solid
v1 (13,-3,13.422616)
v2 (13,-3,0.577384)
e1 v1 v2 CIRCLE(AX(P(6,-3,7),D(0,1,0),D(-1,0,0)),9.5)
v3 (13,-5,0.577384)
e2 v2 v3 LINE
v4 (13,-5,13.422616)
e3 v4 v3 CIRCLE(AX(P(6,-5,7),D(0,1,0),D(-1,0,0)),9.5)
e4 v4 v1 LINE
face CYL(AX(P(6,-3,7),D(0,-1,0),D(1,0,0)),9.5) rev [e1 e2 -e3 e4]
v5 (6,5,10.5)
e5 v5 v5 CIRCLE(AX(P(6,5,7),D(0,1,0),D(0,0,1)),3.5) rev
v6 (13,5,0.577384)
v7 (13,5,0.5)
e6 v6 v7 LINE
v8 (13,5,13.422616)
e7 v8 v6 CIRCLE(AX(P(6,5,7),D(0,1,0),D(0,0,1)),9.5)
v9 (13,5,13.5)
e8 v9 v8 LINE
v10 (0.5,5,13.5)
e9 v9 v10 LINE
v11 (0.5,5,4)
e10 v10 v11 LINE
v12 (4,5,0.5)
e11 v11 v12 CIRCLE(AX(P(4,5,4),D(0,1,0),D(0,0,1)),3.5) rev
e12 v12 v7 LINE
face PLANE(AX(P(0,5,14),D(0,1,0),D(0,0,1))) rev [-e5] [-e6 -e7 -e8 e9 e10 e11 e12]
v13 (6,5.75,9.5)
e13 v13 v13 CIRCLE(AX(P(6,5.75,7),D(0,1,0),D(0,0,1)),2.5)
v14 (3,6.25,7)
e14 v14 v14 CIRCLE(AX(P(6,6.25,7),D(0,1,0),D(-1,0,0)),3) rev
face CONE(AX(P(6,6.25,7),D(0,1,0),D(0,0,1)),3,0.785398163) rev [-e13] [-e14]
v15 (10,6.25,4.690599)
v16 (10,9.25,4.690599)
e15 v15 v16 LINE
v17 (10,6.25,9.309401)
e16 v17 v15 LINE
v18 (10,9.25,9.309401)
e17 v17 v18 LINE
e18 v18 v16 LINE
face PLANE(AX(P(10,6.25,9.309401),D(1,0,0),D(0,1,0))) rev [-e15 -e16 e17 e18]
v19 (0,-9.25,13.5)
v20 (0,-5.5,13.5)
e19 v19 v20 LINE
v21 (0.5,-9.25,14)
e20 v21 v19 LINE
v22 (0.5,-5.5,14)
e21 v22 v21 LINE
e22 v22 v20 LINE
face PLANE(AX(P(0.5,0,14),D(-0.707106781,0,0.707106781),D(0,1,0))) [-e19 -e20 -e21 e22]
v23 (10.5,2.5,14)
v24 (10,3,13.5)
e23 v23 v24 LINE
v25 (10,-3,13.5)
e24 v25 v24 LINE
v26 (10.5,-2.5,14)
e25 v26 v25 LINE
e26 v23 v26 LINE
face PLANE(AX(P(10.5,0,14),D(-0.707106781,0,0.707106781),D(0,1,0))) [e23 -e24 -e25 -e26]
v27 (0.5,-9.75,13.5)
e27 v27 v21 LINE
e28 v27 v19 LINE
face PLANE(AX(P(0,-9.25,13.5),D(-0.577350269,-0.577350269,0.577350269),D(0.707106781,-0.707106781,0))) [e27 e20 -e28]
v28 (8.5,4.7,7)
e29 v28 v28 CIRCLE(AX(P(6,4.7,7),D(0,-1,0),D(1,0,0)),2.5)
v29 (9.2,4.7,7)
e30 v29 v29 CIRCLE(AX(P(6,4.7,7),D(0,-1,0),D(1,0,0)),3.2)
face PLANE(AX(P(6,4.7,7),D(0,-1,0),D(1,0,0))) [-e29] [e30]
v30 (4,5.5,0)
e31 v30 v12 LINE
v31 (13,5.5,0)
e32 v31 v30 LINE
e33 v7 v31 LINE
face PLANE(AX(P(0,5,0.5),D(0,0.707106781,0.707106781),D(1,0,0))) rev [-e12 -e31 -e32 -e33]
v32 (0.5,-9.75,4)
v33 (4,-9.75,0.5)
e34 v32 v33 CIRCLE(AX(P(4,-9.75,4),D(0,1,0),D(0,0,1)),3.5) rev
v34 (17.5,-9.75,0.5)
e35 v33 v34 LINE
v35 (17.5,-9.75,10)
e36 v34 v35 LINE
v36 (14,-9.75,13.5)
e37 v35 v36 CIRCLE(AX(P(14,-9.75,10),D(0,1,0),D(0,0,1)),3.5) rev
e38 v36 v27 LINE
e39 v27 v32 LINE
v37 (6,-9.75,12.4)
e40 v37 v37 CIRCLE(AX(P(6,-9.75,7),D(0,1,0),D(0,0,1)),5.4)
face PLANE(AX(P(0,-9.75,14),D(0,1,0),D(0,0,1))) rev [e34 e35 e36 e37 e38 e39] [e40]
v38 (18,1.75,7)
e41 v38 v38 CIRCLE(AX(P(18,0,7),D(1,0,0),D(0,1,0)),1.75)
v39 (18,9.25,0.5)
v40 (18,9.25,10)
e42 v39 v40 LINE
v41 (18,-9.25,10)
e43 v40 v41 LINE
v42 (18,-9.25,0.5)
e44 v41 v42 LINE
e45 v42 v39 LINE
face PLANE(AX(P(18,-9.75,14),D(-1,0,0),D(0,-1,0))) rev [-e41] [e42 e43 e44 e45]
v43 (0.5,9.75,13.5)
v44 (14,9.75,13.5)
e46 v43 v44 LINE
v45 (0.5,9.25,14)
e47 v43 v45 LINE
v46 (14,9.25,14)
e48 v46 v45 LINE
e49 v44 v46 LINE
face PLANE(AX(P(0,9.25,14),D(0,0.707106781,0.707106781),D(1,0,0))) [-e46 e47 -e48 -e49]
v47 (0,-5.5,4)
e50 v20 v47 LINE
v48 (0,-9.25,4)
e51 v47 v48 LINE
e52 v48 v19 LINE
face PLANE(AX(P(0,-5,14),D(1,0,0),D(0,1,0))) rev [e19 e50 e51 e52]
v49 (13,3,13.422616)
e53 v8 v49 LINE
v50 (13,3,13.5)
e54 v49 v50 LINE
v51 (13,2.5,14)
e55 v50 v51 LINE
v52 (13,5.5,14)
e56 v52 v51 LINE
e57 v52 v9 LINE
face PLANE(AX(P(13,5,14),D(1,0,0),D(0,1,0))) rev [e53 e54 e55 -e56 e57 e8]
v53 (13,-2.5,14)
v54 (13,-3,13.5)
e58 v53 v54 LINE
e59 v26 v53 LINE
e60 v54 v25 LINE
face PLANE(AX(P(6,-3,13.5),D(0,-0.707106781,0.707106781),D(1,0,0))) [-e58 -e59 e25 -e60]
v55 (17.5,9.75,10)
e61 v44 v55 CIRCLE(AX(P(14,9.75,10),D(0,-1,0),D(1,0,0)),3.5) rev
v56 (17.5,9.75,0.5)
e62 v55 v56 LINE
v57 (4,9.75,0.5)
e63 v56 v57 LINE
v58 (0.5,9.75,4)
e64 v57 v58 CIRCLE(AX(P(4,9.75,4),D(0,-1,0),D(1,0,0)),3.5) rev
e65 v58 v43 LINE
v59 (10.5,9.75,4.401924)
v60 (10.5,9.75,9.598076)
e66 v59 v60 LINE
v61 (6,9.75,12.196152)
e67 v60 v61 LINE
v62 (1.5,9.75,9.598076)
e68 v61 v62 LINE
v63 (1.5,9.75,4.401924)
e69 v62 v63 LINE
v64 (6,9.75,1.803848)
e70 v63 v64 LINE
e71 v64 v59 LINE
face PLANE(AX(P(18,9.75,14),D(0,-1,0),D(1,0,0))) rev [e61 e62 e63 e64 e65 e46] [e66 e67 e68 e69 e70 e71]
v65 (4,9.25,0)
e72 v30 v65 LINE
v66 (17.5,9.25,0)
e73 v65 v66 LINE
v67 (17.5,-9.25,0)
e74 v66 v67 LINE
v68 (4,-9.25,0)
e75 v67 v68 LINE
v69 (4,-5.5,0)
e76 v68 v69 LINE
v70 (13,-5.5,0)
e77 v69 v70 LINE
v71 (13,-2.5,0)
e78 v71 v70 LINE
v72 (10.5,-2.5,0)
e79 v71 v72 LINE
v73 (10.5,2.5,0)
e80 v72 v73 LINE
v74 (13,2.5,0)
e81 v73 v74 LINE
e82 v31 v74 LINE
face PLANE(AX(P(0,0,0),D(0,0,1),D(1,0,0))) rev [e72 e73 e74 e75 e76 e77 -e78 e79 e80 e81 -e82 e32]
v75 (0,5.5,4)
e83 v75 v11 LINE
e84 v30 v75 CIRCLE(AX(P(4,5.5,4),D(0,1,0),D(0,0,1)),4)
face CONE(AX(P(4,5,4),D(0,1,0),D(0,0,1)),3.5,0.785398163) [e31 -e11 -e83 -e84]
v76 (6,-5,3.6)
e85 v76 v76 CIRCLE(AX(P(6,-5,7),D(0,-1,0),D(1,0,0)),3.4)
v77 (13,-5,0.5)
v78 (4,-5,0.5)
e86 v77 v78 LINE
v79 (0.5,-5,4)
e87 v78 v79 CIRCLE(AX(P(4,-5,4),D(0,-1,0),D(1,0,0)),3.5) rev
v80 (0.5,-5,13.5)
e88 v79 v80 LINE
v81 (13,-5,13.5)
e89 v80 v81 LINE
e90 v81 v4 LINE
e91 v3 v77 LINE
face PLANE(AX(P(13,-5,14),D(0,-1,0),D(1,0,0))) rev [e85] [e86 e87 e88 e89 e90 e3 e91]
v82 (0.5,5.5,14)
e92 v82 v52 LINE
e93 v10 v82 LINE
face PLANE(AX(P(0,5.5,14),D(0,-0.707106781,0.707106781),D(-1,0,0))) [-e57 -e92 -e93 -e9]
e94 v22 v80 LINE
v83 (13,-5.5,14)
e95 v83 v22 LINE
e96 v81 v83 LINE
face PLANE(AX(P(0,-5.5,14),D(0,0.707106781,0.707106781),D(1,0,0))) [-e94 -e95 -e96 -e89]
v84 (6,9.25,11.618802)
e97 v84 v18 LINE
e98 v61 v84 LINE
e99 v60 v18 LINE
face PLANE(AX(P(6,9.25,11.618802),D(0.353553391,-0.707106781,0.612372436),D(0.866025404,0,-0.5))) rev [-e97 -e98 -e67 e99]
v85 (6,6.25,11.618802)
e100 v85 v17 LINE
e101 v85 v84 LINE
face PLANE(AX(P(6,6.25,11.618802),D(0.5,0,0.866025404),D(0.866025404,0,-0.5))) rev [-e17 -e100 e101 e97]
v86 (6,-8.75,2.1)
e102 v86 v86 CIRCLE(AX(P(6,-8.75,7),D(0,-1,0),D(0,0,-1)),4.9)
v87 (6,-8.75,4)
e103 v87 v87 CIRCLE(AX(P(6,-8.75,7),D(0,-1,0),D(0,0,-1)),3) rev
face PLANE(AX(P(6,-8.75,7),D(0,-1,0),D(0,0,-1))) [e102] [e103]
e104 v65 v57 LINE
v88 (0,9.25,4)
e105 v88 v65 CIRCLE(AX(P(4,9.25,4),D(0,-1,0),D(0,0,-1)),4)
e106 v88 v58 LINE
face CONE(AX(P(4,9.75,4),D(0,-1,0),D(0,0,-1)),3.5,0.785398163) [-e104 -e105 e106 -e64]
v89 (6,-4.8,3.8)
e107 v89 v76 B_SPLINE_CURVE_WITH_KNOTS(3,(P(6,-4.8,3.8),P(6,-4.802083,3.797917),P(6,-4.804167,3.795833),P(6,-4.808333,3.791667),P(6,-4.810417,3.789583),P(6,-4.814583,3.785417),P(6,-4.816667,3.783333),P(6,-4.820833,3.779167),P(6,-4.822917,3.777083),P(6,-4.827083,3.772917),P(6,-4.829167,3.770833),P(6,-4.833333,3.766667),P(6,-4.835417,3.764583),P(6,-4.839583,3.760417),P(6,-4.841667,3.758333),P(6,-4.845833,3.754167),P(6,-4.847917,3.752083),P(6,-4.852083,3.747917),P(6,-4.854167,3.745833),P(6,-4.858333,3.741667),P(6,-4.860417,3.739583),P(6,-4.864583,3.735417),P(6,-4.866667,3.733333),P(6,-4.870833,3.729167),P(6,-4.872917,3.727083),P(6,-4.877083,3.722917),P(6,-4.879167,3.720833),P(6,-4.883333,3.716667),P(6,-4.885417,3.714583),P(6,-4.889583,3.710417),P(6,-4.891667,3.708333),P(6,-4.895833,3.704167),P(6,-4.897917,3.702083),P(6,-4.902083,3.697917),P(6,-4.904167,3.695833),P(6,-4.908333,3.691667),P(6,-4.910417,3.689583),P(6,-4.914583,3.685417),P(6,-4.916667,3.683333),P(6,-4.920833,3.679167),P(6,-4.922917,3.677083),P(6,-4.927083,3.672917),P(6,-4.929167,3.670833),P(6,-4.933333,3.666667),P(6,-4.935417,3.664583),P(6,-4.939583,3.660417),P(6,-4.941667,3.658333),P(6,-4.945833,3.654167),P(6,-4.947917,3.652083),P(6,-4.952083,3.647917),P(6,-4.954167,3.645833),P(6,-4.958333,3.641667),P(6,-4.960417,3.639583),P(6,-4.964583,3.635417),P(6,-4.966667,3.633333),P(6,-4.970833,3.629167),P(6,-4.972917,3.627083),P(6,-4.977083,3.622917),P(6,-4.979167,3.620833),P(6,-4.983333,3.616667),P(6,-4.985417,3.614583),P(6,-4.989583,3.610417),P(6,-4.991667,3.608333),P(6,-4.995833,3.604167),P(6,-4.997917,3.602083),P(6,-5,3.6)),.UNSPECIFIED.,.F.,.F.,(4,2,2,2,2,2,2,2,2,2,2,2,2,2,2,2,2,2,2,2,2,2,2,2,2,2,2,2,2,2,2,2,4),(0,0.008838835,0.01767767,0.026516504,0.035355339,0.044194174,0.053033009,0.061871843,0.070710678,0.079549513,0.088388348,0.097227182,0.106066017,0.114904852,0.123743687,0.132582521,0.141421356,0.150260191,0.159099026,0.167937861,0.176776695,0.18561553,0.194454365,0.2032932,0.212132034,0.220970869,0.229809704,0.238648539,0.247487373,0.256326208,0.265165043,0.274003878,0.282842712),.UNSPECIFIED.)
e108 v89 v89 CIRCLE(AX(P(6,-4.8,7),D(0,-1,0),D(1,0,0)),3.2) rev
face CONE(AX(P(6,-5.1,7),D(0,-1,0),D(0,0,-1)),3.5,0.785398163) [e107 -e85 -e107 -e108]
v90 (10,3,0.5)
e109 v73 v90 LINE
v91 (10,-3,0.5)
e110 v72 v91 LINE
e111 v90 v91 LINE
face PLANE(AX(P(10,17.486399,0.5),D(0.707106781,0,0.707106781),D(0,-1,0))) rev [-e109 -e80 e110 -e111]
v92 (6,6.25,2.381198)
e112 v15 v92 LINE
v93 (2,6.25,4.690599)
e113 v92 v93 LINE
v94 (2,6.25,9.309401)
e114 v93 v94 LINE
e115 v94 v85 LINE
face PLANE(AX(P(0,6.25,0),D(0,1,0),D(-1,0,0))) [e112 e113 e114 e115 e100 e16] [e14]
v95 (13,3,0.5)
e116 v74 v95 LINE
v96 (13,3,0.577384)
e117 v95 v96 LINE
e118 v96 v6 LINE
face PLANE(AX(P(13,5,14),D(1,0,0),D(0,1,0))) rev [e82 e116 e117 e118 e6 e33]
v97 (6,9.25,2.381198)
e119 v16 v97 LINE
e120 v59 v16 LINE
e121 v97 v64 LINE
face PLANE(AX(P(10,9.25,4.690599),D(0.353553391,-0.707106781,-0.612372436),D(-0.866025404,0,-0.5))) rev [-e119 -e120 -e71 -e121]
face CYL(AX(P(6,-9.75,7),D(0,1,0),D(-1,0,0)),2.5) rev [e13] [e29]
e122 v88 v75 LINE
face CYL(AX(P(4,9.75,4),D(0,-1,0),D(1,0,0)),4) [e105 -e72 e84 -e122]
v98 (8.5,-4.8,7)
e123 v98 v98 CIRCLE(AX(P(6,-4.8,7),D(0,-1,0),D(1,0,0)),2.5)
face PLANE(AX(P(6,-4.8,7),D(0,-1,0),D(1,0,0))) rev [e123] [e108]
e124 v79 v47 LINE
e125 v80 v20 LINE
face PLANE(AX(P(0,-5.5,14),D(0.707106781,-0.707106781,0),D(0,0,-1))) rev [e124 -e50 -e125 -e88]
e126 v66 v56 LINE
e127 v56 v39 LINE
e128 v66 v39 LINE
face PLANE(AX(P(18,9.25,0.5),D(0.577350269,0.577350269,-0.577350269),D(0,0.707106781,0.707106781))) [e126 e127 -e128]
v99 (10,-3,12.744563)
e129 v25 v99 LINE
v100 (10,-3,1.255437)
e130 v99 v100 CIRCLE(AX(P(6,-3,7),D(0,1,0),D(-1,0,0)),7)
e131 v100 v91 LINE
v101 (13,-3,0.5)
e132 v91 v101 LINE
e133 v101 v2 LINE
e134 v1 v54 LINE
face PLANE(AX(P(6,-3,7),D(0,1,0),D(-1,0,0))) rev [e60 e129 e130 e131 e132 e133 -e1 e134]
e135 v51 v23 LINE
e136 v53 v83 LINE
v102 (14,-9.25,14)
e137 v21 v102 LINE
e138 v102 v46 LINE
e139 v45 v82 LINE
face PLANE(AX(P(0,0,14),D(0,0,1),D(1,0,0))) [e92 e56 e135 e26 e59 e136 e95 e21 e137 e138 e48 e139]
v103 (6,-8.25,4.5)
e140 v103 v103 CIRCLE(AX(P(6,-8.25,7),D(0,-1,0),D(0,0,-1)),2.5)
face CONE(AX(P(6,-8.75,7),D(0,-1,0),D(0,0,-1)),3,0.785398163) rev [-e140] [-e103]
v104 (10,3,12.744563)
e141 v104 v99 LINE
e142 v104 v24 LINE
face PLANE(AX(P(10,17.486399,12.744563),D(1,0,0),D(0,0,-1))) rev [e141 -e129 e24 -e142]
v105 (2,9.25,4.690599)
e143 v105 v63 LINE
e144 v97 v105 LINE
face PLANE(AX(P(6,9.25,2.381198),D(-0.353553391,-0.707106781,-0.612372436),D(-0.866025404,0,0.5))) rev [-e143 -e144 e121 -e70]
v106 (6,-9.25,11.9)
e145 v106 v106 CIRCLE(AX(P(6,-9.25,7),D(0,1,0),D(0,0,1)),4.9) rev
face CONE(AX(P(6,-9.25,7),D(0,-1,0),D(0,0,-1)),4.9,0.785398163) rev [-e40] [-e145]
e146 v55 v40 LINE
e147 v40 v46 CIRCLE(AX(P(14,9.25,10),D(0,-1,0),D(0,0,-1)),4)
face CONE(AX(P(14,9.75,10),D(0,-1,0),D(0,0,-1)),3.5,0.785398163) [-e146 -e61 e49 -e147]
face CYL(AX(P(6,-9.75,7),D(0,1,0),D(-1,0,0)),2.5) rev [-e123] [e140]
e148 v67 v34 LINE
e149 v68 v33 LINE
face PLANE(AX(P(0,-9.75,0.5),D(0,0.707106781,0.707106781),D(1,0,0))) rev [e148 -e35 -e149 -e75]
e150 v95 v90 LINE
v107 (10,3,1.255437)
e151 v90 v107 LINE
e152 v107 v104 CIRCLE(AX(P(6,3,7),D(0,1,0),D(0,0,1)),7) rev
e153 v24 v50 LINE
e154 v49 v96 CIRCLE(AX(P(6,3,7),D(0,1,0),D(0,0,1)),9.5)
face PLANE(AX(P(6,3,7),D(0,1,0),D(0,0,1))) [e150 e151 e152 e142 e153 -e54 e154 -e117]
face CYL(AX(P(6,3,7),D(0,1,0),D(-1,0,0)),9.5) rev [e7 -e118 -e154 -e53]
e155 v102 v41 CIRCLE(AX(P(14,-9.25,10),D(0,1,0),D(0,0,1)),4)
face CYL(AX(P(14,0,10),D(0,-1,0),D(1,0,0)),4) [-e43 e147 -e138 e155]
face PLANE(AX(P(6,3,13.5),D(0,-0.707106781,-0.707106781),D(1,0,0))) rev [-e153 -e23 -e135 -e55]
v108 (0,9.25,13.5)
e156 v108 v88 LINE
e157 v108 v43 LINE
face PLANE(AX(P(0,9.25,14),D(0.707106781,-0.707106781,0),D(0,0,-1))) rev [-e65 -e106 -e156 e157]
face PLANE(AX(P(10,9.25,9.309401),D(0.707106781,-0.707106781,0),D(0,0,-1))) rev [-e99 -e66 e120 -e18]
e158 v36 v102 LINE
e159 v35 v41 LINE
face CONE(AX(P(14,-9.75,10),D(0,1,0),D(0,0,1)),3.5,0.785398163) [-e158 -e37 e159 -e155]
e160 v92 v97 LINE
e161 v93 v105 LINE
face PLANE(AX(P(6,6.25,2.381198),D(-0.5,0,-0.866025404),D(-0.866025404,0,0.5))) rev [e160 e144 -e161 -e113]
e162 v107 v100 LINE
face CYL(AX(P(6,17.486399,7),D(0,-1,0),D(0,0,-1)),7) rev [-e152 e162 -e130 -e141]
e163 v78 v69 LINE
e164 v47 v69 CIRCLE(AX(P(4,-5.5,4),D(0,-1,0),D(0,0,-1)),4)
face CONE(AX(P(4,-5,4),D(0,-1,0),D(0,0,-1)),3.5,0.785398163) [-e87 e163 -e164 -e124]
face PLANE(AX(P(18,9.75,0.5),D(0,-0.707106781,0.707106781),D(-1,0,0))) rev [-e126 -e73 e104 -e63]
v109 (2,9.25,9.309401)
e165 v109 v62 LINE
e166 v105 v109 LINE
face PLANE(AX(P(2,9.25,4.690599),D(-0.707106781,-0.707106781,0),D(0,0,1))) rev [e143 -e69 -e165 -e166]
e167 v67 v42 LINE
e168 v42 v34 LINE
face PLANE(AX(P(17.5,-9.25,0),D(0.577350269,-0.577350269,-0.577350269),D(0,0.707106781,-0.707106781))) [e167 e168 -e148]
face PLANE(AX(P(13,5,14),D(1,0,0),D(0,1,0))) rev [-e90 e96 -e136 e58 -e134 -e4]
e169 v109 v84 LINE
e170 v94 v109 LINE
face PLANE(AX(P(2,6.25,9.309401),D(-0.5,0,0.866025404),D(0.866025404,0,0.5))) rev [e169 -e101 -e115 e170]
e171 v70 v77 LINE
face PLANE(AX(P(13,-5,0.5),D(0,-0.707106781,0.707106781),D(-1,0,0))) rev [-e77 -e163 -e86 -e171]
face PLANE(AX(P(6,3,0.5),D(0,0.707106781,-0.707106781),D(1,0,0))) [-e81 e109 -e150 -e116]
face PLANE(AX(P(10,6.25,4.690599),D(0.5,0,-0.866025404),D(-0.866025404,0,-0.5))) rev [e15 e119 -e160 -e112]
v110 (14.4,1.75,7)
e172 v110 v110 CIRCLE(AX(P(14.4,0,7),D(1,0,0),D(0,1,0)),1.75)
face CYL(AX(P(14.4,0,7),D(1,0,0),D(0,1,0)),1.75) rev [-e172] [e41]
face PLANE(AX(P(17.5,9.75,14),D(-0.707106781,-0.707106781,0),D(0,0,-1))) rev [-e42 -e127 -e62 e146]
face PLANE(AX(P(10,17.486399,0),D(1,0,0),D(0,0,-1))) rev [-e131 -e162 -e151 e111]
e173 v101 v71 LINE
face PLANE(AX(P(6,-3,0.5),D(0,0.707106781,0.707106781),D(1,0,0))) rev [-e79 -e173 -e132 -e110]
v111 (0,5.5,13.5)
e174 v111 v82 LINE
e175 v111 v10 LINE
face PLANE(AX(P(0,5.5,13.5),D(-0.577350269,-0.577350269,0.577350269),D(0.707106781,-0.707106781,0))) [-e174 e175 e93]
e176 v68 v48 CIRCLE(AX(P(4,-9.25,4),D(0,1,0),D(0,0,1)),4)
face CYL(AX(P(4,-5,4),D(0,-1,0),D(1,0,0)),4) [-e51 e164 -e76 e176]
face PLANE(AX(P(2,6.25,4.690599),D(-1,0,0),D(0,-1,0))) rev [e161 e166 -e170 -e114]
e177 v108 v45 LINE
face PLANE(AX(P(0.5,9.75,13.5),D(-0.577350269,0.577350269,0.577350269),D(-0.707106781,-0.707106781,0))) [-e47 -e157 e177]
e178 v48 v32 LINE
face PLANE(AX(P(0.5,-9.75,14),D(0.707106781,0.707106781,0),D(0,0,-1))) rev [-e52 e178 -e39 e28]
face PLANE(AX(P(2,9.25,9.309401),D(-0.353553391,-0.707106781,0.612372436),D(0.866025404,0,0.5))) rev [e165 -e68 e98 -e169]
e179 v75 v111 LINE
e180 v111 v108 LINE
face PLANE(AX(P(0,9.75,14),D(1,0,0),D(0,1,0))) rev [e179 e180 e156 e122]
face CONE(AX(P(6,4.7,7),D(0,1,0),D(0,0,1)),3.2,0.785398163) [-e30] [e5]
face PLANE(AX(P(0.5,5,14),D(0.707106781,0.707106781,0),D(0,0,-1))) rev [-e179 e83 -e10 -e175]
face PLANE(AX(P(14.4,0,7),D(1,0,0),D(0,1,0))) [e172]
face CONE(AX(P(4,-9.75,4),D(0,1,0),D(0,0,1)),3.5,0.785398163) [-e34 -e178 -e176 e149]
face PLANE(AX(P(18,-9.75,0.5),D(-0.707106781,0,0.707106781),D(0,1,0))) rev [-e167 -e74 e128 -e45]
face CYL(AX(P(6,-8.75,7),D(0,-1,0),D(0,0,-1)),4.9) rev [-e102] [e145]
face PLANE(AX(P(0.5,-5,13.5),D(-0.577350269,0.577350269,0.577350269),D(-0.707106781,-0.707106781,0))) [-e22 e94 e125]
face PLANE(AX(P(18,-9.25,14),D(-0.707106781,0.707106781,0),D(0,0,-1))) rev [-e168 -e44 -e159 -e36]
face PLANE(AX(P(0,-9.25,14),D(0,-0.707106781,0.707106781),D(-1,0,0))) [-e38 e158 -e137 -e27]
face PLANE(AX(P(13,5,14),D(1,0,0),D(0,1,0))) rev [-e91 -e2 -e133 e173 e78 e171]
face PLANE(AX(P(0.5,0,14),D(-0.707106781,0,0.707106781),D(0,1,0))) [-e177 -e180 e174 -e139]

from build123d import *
from build123d.topology import SkipClean

# Parameters (mm, degrees)
BOSS_EXTRUDE1_DEPTH             = 14
SKETCH2_R                       = 2.5
CUT_EXTRUDE1_DEPTH              = 31.004166377
SKETCH3_R                       = 9.5
CUT_EXTRUDE2_DEPTH              = 2
CUT_EXTRUDE3_START              = 8
SKETCH3_2_R                     = 9.5
CUT_EXTRUDE3_DEPTH              = 2
BOSS_EXTRUDE2_REACH             = 26.8
BOSS_EXTRUDE2_DIRECTION_2_REACH = 26.8
SKETCH5_R                       = 1.75
CUT_EXTRUDE4_DEPTH              = 3.6
CUT_EXTRUDE5_DEPTH              = 3.5
SKETCH7_R                       = 4.9
CUT_EXTRUDE6_DEPTH              = 1
SKETCH9_R                       = 3.5
SKETCH9_R_2                     = 2.5
BOSS_EXTRUDE3_DEPTH             = 0.3
BOSS_EXTRUDE5_START             = 9.8
SKETCH9_2_R                     = 3.5
SKETCH9_2_R_2                   = 2.5
BOSS_EXTRUDE5_DEPTH             = 0.2
FILLET1_R                       = 4
CHAMFER1_SIZE                   = 0.5
CHAMFER2_SIZE                   = 0.3
CHAMFER3_SIZE                   = 0.5


with BuildPart() as part:
    # Sketch1 → Boss-Extrude1 (new body)
    with BuildSketch(Plane.XY):
        Polygon((0, -9.75), (18, -9.75), (18, 9.75), (0, 9.75), (0, 5), (13, 5), (13, -5), (0, -5), align=None)
    extrude(amount=BOSS_EXTRUDE1_DEPTH)

    # Sketch2 → Cut-Extrude1 (cut, through all)
    with BuildSketch(Plane(origin=(0, 9.75, 0), x_dir=(1, 0, 0), z_dir=(0, 1, 0))):
        with Locations(Location((6, -7, 0), (0, 0, 180))):
            Circle(SKETCH2_R)
    extrude(amount=-CUT_EXTRUDE1_DEPTH, mode=Mode.SUBTRACT)

    # Sketch3 → Cut-Extrude2 (cut)
    with BuildSketch(Plane(origin=(0, -5, 0), x_dir=(1, 0, 0), z_dir=(0, 1, 0))):
        with Locations((6, -7)):
            Circle(SKETCH3_R)
    extrude(amount=CUT_EXTRUDE2_DEPTH, mode=Mode.SUBTRACT)

    # Sketch3<2> → Cut-Extrude3 (cut)
    with BuildSketch(Plane(origin=(0, -5, 0), x_dir=(1, 0, 0), z_dir=(0, 1, 0)).offset(CUT_EXTRUDE3_START)):
        with Locations((6, -7)):
            Circle(SKETCH3_2_R)
    extrude(amount=CUT_EXTRUDE3_DEPTH, mode=Mode.SUBTRACT)

    # Boss-Extrude2: up to this face of the body (flat: up to its plane)
    boss_extrude2_end = Plane(part.part.faces().sort_by_distance((14.012212464, 3, 7))[0])
    # Sketch4 → Boss-Extrude2 (add, up to the picked face)
    with BuildSketch(Plane(origin=(0, 0, 0), x_dir=(1, 0, 0), z_dir=(0, 1, 0)), mode=Mode.PRIVATE) as boss_extrude2_sk1:
        with BuildLine():
            Line((10, -14), (13.722333535, -14))
            Line((13.722333535, -14), (13.722333535, 0))
            Line((13.722333535, 0), (10, 0))
            Line((10, 0), (10, -1.255437353))
            ThreePointArc((10, -1.255437353), (13, -7), (10, -12.744562647))
            Line((10, -12.744562647), (10, -14))
        make_face()
    boss_extrude2_tool1 = split(extrude(boss_extrude2_sk1.sketch, amount=BOSS_EXTRUDE2_REACH, mode=Mode.PRIVATE), bisect_by=boss_extrude2_end, keep=Keep.BOTH, mode=Mode.PRIVATE)
    add(boss_extrude2_tool1.solids().sort_by(Axis((10.144864, 0, 13.372281), (0, 1, 0)))[0])

    # Boss-Extrude2 direction 2: up to this face of the body (flat: up to its plane)
    boss_extrude2_direction_2_end = Plane(part.part.faces().sort_by_distance((14.012212464, -3, 7))[0])
    # Sketch4 → Boss-Extrude2 direction 2 (add, up to the picked face)
    with BuildSketch(Plane(origin=(0, 0, 0), x_dir=(1, 0, 0), z_dir=(0, 1, 0)), mode=Mode.PRIVATE) as boss_extrude2_direction_2_sk1:
        with BuildLine():
            Line((10, -14), (13.722333535, -14))
            Line((13.722333535, -14), (13.722333535, 0))
            Line((13.722333535, 0), (10, 0))
            Line((10, 0), (10, -1.255437353))
            ThreePointArc((10, -1.255437353), (13, -7), (10, -12.744562647))
            Line((10, -12.744562647), (10, -14))
        make_face()
    boss_extrude2_direction_2_tool1 = split(extrude(boss_extrude2_direction_2_sk1.sketch, amount=-BOSS_EXTRUDE2_DIRECTION_2_REACH, mode=Mode.PRIVATE), bisect_by=boss_extrude2_direction_2_end, keep=Keep.BOTH, mode=Mode.PRIVATE)
    add(boss_extrude2_direction_2_tool1.solids().sort_by(Axis((10.144864, 0, 13.372281), (0, -1, 0)))[0])

    # Sketch5 → Cut-Extrude4 (cut)
    with BuildSketch(Plane(origin=(18, 0, 0), x_dir=(0, 0, -1), z_dir=(1, 0, 0))):
        with Locations(Location((-7, 0, 0), (0, 0, 90))):
            Circle(SKETCH5_R)
    extrude(amount=-CUT_EXTRUDE4_DEPTH, mode=Mode.SUBTRACT)

    # Sketch6 → Cut-Extrude5 (cut)
    with BuildSketch(Plane(origin=(0, 9.75, 0), x_dir=(1, 0, 0), z_dir=(0, 1, 0))):
        Polygon((6, -2.381197846), (2, -4.690598923), (2, -9.309401077), (6, -11.618802154), (10, -9.309401077), (10, -4.690598923), align=None)
    extrude(amount=-CUT_EXTRUDE5_DEPTH, mode=Mode.SUBTRACT)

    # Sketch7 → Cut-Extrude6 (cut)
    with BuildSketch(Plane.XZ.offset(9.75)):
        with Locations(Location((6, 7, 0), (0, 0, 270))):
            Circle(SKETCH7_R)
    extrude(amount=-CUT_EXTRUDE6_DEPTH, mode=Mode.SUBTRACT)

    # Sketch9 → Boss-Extrude3 (add)
    with SkipClean():  # the faces are left unmerged after this step: merging them gives an invalid solid
        with BuildSketch(Plane.XZ.offset(-5)):
            with Locations(Location((6, 7, 0), (0, 0, 90))):
                Circle(SKETCH9_R)
            with Locations(Location((6, 7, 0), (0, 0, 270))):
                Circle(SKETCH9_R_2, mode=Mode.SUBTRACT)
        extrude(amount=BOSS_EXTRUDE3_DEPTH)

    # Sketch9<2> → Boss-Extrude5 (add)
    with SkipClean():  # the faces are left unmerged after this step: merging them gives an invalid solid
        with BuildSketch(Plane.XZ.offset(-5).offset(BOSS_EXTRUDE5_START)):
            with Locations(Location((6, 7, 0), (0, 0, 90))):
                Circle(SKETCH9_2_R)
            with Locations(Location((6, 7, 0), (0, 0, 270))):
                Circle(SKETCH9_2_R_2, mode=Mode.SUBTRACT)
        extrude(amount=BOSS_EXTRUDE5_DEPTH)

    # Fillet1
    fillet1_edges = [part.edges().sort_by_distance(p)[0] for p in [
        (0, -7.375, 0),
        (18, 0, 14),
        (0, 7.375, 0),
    ]]
    fillet(fillet1_edges, radius=FILLET1_R)

    # Chamfer1
    chamfer1_edges = [part.edges().sort_by_distance(p)[0] for p in [
        (8, 9.75, 3.535898385),
        (4, 9.75, 3.535898385),
        (2, 9.75, 7),
        (4, 9.75, 10.464101615),
        (8, 9.75, 10.464101615),
        (10, 9.75, 7),
        (6, -9.75, 11.9),
    ]]
    chamfer(chamfer1_edges, length=CHAMFER1_SIZE)

    # Chamfer2
    # the kernel refuses this chamfer: 0.3 mm, written as the material it takes off along each edge
    with BuildSketch(Plane(origin=(6, 4.7, 7), x_dir=(0, 0, 1), z_dir=(1, 0, 0))) as chamfer2_piece_1_section:
        Polygon((3.5, -CHAMFER2_SIZE), (3.5 - CHAMFER2_SIZE, 0), (3.5, 0), align=None)
    chamfer2_piece_1 = revolve(axis=Axis((6, 4.7, 7), (0, -1, 0)), mode=Mode.PRIVATE)
    chamfer2_piece_1 = split(chamfer2_piece_1, bisect_by=Plane(origin=(6, 5, 3.647041133), z_dir=(0, -1, 0)), keep=Keep.TOP, mode=Mode.PRIVATE)
    add(chamfer2_piece_1, mode=Mode.SUBTRACT)
    with BuildSketch(Plane(origin=(6, -4.8, 7), x_dir=(0, 0, 1), z_dir=(1, 0, 0))) as chamfer2_piece_2_section:
        Polygon((3.5, CHAMFER2_SIZE), (3.5 - CHAMFER2_SIZE, 0), (3.5, 0), align=None)
    chamfer2_piece_2 = revolve(axis=Axis((6, -4.8, 7), (0, -1, 0)), mode=Mode.PRIVATE)
    chamfer2_piece_2 = split(chamfer2_piece_2, bisect_by=Plane(origin=(6, -5, 3.697354153), z_dir=(0, 1, 0)), keep=Keep.TOP, mode=Mode.PRIVATE)
    add(chamfer2_piece_2, mode=Mode.SUBTRACT)

    # Chamfer3
    chamfer3_edges = [part.edges().sort_by_distance(p)[0] for p in [
        (11, 9.75, 0),
        (18, 0, 0),
        (8.5, 6.25, 7),
        (8.5, -8.75, 7),
        (0, -5, 9),
        (0, 5, 9),
        (0, 9.75, 9),
        (0, -9.75, 9),
        (11, -9.75, 0),
        (18, -9.75, 5),
        (16.828427125, -9.75, 12.828427125),
        (1.171572875, -9.75, 1.171572875),
        (8.5, 5, 0),
        (1.171572875, -5, 1.171572875),
        (1.171572875, 5, 1.171572875),
        (7, 9.75, 14),
        (18, 9.75, 5),
        (16.828427125, 9.75, 12.828427125),
        (1.171572875, 9.75, 1.171572875),
        (0, 7.375, 14),
        (6.5, 5, 14),
        (6.5, -5, 14),
        (0, -7.375, 14),
        (10, 0, 14),
        (11.5, -3, 14),
        (11.5, 3, 0),
        (11.5, 3, 14),
        (10, 0, 0),
        (11.5, -3, 0),
        (8.5, -5, 0),
        (7, -9.75, 14),
    ]]
    chamfer(chamfer3_edges, length=CHAMFER3_SIZE)


solid = part.part
